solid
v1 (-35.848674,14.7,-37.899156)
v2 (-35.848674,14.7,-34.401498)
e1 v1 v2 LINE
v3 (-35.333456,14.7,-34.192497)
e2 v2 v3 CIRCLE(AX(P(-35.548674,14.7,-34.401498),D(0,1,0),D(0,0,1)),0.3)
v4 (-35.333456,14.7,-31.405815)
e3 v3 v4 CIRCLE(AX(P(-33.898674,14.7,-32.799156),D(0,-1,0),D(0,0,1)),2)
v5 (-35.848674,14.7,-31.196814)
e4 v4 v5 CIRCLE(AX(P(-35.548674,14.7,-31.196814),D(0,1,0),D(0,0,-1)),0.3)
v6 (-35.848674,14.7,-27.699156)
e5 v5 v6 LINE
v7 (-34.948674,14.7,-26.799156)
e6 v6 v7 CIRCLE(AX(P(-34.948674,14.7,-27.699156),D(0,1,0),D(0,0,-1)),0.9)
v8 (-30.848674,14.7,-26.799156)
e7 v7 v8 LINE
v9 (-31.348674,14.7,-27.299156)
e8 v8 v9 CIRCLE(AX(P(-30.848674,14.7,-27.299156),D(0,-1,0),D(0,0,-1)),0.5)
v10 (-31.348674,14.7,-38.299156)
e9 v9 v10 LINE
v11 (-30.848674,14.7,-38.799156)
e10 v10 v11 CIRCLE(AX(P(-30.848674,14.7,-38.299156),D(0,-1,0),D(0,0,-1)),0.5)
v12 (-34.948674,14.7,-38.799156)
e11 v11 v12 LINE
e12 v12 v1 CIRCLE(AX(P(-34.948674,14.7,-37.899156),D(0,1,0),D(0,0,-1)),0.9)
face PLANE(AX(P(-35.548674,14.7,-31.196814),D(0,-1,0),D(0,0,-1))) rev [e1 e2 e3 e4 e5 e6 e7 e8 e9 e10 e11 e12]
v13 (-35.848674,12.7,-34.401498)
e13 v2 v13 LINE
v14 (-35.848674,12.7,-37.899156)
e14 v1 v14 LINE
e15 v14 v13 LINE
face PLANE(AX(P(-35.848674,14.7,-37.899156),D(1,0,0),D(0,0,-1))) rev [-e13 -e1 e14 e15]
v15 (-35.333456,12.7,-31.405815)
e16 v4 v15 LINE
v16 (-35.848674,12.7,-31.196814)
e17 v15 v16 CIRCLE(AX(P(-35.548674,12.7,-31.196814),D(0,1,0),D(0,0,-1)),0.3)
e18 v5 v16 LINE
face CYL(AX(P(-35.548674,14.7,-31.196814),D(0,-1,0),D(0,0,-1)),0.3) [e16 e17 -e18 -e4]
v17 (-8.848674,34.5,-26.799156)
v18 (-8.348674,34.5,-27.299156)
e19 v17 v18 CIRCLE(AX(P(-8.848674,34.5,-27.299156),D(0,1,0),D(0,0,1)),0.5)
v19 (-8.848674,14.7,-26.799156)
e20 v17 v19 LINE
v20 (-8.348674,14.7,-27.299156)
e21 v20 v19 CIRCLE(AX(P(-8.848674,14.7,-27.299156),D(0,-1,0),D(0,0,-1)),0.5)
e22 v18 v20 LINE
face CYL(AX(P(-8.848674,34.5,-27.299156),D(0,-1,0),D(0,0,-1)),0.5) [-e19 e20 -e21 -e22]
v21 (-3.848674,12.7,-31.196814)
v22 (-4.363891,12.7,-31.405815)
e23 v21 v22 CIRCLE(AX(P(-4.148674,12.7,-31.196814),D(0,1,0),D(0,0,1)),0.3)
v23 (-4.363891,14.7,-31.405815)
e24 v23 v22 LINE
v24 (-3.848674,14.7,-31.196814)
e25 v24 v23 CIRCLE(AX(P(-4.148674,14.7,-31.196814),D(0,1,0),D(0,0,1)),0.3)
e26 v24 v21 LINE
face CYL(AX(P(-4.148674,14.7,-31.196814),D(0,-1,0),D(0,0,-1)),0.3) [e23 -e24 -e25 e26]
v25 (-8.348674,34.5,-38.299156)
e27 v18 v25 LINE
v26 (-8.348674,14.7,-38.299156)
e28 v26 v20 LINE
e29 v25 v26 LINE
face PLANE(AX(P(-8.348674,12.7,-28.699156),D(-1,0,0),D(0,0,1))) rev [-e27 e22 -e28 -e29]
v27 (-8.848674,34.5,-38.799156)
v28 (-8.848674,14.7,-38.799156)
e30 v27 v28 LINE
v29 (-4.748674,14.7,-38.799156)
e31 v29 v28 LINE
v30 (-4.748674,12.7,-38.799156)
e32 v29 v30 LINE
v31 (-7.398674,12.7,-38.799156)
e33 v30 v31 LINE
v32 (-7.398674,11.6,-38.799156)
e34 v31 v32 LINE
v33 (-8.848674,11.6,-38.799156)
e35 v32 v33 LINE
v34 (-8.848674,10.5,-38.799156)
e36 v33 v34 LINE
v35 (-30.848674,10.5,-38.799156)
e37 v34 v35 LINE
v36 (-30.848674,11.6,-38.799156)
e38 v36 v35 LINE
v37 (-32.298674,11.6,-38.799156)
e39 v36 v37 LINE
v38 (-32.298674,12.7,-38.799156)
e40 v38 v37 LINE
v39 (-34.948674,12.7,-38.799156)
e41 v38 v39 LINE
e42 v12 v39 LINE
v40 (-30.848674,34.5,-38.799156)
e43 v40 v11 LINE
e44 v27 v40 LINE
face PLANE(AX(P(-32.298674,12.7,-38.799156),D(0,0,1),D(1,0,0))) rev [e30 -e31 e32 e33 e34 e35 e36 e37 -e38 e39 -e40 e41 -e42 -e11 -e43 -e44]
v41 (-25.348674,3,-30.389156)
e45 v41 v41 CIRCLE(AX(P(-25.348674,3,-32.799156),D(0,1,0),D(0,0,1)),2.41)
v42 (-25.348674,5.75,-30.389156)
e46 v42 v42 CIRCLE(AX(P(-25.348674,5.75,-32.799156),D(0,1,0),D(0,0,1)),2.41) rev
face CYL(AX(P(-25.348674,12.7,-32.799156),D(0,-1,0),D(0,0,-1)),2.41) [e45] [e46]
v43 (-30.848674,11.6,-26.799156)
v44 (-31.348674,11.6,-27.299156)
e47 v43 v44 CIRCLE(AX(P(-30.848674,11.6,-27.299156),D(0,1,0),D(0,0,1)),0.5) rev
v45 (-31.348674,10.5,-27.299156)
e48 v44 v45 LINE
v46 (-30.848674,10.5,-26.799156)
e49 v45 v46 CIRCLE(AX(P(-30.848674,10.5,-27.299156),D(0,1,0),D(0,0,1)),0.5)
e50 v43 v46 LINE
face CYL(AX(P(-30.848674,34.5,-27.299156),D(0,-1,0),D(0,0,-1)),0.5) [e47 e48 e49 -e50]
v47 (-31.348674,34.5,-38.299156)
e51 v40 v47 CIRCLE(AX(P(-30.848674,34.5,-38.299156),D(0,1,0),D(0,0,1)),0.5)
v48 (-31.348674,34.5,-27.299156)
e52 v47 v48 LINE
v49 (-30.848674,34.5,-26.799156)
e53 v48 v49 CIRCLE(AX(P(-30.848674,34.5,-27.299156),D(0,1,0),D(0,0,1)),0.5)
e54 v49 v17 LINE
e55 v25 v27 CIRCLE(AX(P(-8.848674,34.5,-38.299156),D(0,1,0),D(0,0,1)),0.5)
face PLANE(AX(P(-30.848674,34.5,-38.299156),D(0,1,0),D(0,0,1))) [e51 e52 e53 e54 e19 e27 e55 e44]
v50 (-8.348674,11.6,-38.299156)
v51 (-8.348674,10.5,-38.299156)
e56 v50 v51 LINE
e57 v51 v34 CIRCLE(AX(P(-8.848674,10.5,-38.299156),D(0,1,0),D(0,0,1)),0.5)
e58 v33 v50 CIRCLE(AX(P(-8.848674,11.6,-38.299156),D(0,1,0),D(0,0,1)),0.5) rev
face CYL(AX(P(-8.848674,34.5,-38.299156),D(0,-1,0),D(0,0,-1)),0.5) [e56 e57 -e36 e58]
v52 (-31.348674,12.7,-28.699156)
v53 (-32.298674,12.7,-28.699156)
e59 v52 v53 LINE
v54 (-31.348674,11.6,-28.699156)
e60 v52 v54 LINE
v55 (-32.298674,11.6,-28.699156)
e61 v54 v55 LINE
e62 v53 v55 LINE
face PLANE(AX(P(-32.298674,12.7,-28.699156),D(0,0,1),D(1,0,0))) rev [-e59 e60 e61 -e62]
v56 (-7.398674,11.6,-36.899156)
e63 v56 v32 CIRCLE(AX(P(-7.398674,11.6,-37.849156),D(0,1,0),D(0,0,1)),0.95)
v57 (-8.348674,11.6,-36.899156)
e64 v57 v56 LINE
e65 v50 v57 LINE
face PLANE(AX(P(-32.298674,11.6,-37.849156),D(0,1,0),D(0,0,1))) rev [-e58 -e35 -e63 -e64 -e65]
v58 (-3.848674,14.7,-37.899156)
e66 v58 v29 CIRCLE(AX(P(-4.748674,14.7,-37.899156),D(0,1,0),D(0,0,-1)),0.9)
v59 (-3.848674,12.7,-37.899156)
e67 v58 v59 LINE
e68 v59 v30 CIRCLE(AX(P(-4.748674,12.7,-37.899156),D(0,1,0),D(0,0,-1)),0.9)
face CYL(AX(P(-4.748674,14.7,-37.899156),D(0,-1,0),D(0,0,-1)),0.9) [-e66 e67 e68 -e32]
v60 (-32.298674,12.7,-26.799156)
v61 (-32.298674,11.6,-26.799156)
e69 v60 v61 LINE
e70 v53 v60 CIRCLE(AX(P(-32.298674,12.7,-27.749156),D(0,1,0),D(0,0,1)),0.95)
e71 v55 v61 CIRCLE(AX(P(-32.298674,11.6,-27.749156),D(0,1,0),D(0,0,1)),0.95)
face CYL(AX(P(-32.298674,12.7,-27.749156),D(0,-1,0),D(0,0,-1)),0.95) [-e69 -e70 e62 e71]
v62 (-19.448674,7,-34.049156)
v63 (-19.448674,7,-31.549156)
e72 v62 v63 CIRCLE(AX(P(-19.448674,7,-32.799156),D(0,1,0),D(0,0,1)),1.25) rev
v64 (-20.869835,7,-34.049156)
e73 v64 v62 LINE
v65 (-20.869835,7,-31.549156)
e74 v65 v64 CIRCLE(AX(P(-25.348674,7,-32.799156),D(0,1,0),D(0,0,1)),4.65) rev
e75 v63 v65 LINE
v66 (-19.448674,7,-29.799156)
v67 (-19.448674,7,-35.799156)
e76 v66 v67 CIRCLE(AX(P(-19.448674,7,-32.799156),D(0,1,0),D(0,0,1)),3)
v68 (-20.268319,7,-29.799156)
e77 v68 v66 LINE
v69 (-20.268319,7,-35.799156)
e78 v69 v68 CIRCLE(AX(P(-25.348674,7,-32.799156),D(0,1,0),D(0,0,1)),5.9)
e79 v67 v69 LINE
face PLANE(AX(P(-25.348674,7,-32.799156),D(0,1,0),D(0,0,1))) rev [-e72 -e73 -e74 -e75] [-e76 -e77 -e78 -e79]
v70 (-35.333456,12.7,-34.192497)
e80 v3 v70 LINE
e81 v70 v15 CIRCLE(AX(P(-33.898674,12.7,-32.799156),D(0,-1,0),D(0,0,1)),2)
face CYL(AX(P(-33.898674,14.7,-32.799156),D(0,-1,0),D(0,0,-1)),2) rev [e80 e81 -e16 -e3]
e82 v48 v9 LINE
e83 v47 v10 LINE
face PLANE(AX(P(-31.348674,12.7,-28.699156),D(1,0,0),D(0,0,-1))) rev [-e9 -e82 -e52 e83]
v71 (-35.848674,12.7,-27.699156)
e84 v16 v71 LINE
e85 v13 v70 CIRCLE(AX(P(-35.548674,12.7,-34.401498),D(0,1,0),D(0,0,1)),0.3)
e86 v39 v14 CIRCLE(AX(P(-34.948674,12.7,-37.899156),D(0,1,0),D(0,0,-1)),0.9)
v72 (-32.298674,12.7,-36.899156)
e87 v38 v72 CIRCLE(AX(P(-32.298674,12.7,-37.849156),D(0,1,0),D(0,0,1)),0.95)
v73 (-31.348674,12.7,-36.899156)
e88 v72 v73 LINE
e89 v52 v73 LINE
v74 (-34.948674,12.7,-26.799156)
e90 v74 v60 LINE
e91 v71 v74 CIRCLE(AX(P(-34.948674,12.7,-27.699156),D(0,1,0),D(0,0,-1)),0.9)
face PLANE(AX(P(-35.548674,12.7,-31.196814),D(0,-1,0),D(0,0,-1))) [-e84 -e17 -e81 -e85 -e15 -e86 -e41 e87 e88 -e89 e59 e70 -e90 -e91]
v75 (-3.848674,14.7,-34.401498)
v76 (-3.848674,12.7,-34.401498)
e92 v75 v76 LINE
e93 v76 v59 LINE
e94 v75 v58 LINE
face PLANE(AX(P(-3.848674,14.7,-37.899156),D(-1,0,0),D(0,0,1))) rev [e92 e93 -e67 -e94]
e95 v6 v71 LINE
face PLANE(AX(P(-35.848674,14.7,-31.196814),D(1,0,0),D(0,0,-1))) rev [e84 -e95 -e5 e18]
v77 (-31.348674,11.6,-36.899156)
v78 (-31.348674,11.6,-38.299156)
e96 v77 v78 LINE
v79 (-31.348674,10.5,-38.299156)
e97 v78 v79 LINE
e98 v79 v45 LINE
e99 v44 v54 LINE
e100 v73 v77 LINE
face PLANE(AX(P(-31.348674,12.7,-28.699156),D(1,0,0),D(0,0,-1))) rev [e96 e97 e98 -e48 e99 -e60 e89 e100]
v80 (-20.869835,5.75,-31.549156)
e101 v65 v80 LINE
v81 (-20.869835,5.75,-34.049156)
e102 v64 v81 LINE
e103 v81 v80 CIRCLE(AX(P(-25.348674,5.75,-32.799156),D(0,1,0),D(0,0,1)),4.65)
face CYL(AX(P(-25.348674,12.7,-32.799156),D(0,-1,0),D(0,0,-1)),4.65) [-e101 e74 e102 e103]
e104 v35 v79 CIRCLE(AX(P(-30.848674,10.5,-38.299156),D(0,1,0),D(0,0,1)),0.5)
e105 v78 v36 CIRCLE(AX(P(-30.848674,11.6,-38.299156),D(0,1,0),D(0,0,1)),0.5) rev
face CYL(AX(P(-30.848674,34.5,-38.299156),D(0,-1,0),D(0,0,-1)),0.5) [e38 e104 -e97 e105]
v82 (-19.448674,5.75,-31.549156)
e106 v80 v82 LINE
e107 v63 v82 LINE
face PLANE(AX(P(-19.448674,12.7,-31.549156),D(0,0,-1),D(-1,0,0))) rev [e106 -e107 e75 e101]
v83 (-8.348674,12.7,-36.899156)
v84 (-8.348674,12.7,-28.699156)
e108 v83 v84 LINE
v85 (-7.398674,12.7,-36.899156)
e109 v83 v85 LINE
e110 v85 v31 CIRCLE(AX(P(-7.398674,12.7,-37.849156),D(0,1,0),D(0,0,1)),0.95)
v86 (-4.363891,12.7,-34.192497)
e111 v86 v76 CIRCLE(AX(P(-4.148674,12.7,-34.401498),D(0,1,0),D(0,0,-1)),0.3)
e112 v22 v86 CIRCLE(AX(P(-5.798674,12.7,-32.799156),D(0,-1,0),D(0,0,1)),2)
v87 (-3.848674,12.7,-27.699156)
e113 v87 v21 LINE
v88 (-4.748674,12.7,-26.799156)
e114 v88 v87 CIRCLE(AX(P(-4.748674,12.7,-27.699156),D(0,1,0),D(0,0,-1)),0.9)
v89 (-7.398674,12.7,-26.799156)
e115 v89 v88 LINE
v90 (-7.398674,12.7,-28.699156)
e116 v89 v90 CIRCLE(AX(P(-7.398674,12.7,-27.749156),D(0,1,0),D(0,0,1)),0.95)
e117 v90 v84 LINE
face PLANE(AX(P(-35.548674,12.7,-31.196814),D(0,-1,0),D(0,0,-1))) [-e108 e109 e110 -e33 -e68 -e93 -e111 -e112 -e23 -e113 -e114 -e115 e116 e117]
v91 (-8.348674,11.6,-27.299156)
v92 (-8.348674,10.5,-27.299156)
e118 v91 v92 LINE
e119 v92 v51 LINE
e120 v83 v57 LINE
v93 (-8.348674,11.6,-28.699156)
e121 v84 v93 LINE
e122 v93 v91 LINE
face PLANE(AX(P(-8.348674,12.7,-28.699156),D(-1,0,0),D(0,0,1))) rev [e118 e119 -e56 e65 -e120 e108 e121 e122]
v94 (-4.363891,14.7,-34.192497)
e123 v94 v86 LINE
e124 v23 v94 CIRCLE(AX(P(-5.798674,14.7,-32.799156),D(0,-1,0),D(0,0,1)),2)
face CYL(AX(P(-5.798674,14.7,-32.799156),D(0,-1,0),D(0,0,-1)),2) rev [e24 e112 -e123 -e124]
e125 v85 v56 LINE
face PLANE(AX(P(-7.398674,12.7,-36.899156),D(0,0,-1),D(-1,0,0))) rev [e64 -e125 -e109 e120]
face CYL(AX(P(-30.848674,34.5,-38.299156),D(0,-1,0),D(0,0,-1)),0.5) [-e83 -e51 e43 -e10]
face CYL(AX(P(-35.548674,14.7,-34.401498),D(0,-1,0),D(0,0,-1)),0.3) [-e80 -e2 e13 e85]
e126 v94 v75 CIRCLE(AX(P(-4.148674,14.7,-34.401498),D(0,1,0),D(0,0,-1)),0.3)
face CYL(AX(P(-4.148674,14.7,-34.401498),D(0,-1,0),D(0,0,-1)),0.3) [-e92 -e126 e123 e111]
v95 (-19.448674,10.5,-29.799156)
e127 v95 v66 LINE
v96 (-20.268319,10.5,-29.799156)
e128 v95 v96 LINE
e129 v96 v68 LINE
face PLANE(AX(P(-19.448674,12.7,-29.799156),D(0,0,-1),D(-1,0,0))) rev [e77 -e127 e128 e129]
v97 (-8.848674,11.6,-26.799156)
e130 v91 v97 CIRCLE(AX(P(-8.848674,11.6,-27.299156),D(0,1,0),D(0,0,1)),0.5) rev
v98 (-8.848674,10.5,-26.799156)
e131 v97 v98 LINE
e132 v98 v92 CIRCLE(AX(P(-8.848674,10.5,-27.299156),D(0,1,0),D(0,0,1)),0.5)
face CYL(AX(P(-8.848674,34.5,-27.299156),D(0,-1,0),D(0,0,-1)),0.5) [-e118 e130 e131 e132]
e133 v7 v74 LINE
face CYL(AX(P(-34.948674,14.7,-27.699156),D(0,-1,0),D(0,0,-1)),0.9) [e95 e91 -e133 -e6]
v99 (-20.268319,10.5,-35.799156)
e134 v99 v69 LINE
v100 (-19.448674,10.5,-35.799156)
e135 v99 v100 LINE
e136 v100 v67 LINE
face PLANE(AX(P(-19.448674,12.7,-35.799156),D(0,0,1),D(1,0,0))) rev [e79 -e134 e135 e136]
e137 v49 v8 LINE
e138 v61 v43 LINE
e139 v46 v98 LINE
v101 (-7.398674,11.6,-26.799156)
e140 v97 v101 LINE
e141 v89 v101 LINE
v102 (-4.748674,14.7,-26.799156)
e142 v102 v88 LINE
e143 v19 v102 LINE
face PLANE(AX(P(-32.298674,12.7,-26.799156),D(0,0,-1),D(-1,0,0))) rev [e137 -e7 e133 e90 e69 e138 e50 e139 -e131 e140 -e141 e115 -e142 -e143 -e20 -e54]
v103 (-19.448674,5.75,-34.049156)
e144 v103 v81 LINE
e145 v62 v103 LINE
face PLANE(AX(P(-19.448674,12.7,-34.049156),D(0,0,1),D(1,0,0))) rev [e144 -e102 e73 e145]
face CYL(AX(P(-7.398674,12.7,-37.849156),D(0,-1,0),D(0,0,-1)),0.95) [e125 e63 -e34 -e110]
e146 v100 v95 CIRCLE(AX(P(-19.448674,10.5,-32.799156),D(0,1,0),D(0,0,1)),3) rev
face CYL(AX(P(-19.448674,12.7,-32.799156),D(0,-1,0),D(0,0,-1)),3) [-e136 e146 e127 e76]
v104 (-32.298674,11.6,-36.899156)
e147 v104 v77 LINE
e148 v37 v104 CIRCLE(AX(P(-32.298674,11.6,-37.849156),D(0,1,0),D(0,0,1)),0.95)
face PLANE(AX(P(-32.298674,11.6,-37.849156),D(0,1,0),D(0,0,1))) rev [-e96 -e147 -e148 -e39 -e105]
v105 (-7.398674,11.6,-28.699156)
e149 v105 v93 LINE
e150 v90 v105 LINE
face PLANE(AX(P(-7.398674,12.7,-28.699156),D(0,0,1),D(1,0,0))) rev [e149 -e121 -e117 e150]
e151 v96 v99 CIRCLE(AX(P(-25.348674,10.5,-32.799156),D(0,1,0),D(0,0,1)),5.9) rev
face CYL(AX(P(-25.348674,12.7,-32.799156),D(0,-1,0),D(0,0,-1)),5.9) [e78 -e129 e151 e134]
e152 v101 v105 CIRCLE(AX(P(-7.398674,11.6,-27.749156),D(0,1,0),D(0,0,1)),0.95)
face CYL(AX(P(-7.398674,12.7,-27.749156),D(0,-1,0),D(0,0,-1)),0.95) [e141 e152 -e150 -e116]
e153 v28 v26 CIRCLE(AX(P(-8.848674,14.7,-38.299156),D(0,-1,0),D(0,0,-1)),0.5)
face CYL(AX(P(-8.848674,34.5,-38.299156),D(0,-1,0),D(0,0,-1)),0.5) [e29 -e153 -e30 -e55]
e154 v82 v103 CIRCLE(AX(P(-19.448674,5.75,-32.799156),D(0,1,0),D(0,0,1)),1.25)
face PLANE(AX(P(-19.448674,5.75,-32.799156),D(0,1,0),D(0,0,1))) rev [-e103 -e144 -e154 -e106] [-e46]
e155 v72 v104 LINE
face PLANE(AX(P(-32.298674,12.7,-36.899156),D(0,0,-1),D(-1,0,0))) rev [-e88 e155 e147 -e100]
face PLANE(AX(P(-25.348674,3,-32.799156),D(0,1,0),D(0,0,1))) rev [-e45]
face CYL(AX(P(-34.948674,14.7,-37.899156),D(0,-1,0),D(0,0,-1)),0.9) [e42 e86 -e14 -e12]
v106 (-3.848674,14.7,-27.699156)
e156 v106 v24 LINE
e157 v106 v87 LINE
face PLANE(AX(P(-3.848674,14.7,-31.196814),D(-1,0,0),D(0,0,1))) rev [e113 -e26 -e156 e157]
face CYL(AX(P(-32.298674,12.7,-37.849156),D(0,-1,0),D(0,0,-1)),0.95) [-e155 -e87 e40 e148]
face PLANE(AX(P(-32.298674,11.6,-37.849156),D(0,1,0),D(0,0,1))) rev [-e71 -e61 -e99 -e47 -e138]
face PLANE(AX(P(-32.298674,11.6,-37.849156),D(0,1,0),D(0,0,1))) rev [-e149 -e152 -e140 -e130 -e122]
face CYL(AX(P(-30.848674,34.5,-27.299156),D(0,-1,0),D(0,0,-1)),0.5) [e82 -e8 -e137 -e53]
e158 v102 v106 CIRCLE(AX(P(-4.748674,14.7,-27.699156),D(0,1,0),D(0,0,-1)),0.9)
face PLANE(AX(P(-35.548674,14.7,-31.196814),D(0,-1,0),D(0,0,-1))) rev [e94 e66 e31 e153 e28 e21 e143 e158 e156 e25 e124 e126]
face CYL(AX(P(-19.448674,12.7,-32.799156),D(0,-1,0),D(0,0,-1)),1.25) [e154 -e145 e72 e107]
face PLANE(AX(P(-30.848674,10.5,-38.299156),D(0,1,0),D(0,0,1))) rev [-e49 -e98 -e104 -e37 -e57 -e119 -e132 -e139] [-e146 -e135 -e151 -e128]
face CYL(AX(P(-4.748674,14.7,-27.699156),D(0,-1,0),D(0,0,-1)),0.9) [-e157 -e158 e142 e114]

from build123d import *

# Parameters (mm, degrees)
BOSS_EXTRUDE3_DEPTH = 1.1
BOSS_EXTRUDE4_DEPTH = 24
BOSS_EXTRUDE5_DEPTH = 5.7
BOSS_EXTRUDE6_DEPTH = 6.95
SKETCH8_R           = 2.41
BOSS_EXTRUDE7_DEPTH = 9.7
BOSS_EXTRUDE8_DEPTH = 2


# Read off the part's stored shape, not the designer's step: Imported1
with BuildPart() as part:
    # Sketch4 → Boss-Extrude3 (new body)
    with BuildSketch(Plane(origin=(0, 11.6, 0), x_dir=(1, 0, 0), z_dir=(0, 1, 0))):
        with BuildLine():
            Line((-32.298673735, 38.799155683), (-7.398673735, 38.799155683))
            ThreePointArc((-7.398673735, 38.799155683), (-6.448673735, 37.849155683), (-7.398673735, 36.899155683))
            Line((-7.398673735, 36.899155683), (-8.348673735, 36.899155683))
            Line((-8.348673735, 36.899155683), (-8.348673735, 28.699155683))
            Line((-8.348673735, 28.699155683), (-7.398673735, 28.699155683))
            ThreePointArc((-7.398673735, 28.699155683), (-6.448673735, 27.749155683), (-7.398673735, 26.799155683))
            Line((-7.398673735, 26.799155683), (-32.298673735, 26.799155683))
            ThreePointArc((-32.298673735, 26.799155683), (-33.248673735, 27.749155683), (-32.298673735, 28.699155683))
            Line((-32.298673735, 28.699155683), (-31.348673735, 28.699155683))
            Line((-31.348673735, 28.699155683), (-31.348673735, 36.899155683))
            Line((-31.348673735, 36.899155683), (-32.298673735, 36.899155683))
            ThreePointArc((-32.298673735, 36.899155683), (-33.248673735, 37.849155683), (-32.298673735, 38.799155683))
        make_face()
    extrude(amount=BOSS_EXTRUDE3_DEPTH)

    # Sketch5 → Boss-Extrude4 (add)
    with BuildSketch(Plane(origin=(0, 10.5, 0), x_dir=(1, 0, 0), z_dir=(0, 1, 0))):
        with BuildLine():
            Line((-31.348673735, 27.299155683), (-31.348673735, 38.299155683))
            ThreePointArc((-31.348673735, 38.299155683), (-31.202227125, 38.652709074), (-30.848673735, 38.799155683))
            Line((-30.848673735, 38.799155683), (-8.848673735, 38.799155683))
            ThreePointArc((-8.848673735, 38.799155683), (-8.495120344, 38.652709074), (-8.348673735, 38.299155683))
            Line((-8.348673735, 38.299155683), (-8.348673735, 27.299155683))
            ThreePointArc((-8.348673735, 27.299155683), (-8.495120344, 26.945602293), (-8.848673735, 26.799155683))
            Line((-8.848673735, 26.799155683), (-30.848673735, 26.799155683))
            ThreePointArc((-30.848673735, 26.799155683), (-31.202227125, 26.945602293), (-31.348673735, 27.299155683))
        make_face()
    extrude(amount=BOSS_EXTRUDE4_DEPTH)

    # Sketch6 → Boss-Extrude5 (add)
    with BuildSketch(Plane(origin=(0, 7, 0), x_dir=(1, 0, 0), z_dir=(0, 1, 0))):
        with BuildLine():
            Line((-19.448673735, 29.799155683), (-20.268319416, 29.799155683))
            ThreePointArc((-20.268319416, 29.799155683), (-31.248673735, 32.799155683), (-20.268319416, 35.799155683))
            Line((-20.268319416, 35.799155683), (-19.448673735, 35.799155683))
            ThreePointArc((-19.448673735, 35.799155683), (-16.448673735, 32.799155683), (-19.448673735, 29.799155683))
        make_face()
    extrude(amount=BOSS_EXTRUDE5_DEPTH)

    # Sketch7 → Boss-Extrude6 (add)
    with BuildSketch(Plane(origin=(0, 5.75, 0), x_dir=(1, 0, 0), z_dir=(0, 1, 0))):
        with BuildLine():
            Line((-19.448673735, 34.049155683), (-20.869834599, 34.049155683))
            ThreePointArc((-20.869834599, 34.049155683), (-29.998673735, 32.799155683), (-20.869834599, 31.549155683))
            Line((-20.869834599, 31.549155683), (-19.448673735, 31.549155683))
            ThreePointArc((-19.448673735, 31.549155683), (-18.198673735, 32.799155683), (-19.448673735, 34.049155683))
        make_face()
    extrude(amount=BOSS_EXTRUDE6_DEPTH)

    # Sketch8 → Boss-Extrude7 (add)
    with BuildSketch(Plane(origin=(0, 3, 0), x_dir=(1, 0, 0), z_dir=(0, 1, 0))):
        with Locations(Location((-25.348673735, 32.799155683, 0), (0, 0, 270))):
            Circle(SKETCH8_R)
    extrude(amount=BOSS_EXTRUDE7_DEPTH)

    # Sketch1 → Boss-Extrude8 (add)
    with BuildSketch(Plane(origin=(0, 12.7, 0), x_dir=(1, 0, 0), z_dir=(0, 1, 0))):
        with BuildLine():
            Line((-34.948673735, 38.799155683), (-4.748673735, 38.799155683))
            ThreePointArc((-4.748673735, 38.799155683), (-4.112277632, 38.535551786), (-3.848673735, 37.899155683))
            Line((-3.848673735, 37.899155683), (-3.848673735, 34.401497719))
            ThreePointArc((-3.848673735, 34.401497719), (-4.035902323, 34.123500221), (-4.363891126, 34.192496584))
            ThreePointArc((-4.363891126, 34.192496584), (-7.798673735, 32.799155683), (-4.363891126, 31.405814782))
            ThreePointArc((-4.363891126, 31.405814782), (-4.035902323, 31.474811145), (-3.848673735, 31.196813647))
            Line((-3.848673735, 31.196813647), (-3.848673735, 27.699155683))
            ThreePointArc((-3.848673735, 27.699155683), (-4.112277632, 27.06275958), (-4.748673735, 26.799155683))
            Line((-4.748673735, 26.799155683), (-34.948673735, 26.799155683))
            ThreePointArc((-34.948673735, 26.799155683), (-35.585069838, 27.06275958), (-35.848673735, 27.699155683))
            Line((-35.848673735, 27.699155683), (-35.848673735, 31.196813647))
            ThreePointArc((-35.848673735, 31.196813647), (-35.661445146, 31.474811145), (-35.333456343, 31.405814782))
            ThreePointArc((-35.333456343, 31.405814782), (-31.898673735, 32.799155683), (-35.333456343, 34.192496584))
            ThreePointArc((-35.333456343, 34.192496584), (-35.661445146, 34.123500221), (-35.848673735, 34.401497719))
            Line((-35.848673735, 34.401497719), (-35.848673735, 37.899155683))
            ThreePointArc((-35.848673735, 37.899155683), (-35.585069838, 38.535551786), (-34.948673735, 38.799155683))
        make_face()
    extrude(amount=BOSS_EXTRUDE8_DEPTH)


solid = part.part
